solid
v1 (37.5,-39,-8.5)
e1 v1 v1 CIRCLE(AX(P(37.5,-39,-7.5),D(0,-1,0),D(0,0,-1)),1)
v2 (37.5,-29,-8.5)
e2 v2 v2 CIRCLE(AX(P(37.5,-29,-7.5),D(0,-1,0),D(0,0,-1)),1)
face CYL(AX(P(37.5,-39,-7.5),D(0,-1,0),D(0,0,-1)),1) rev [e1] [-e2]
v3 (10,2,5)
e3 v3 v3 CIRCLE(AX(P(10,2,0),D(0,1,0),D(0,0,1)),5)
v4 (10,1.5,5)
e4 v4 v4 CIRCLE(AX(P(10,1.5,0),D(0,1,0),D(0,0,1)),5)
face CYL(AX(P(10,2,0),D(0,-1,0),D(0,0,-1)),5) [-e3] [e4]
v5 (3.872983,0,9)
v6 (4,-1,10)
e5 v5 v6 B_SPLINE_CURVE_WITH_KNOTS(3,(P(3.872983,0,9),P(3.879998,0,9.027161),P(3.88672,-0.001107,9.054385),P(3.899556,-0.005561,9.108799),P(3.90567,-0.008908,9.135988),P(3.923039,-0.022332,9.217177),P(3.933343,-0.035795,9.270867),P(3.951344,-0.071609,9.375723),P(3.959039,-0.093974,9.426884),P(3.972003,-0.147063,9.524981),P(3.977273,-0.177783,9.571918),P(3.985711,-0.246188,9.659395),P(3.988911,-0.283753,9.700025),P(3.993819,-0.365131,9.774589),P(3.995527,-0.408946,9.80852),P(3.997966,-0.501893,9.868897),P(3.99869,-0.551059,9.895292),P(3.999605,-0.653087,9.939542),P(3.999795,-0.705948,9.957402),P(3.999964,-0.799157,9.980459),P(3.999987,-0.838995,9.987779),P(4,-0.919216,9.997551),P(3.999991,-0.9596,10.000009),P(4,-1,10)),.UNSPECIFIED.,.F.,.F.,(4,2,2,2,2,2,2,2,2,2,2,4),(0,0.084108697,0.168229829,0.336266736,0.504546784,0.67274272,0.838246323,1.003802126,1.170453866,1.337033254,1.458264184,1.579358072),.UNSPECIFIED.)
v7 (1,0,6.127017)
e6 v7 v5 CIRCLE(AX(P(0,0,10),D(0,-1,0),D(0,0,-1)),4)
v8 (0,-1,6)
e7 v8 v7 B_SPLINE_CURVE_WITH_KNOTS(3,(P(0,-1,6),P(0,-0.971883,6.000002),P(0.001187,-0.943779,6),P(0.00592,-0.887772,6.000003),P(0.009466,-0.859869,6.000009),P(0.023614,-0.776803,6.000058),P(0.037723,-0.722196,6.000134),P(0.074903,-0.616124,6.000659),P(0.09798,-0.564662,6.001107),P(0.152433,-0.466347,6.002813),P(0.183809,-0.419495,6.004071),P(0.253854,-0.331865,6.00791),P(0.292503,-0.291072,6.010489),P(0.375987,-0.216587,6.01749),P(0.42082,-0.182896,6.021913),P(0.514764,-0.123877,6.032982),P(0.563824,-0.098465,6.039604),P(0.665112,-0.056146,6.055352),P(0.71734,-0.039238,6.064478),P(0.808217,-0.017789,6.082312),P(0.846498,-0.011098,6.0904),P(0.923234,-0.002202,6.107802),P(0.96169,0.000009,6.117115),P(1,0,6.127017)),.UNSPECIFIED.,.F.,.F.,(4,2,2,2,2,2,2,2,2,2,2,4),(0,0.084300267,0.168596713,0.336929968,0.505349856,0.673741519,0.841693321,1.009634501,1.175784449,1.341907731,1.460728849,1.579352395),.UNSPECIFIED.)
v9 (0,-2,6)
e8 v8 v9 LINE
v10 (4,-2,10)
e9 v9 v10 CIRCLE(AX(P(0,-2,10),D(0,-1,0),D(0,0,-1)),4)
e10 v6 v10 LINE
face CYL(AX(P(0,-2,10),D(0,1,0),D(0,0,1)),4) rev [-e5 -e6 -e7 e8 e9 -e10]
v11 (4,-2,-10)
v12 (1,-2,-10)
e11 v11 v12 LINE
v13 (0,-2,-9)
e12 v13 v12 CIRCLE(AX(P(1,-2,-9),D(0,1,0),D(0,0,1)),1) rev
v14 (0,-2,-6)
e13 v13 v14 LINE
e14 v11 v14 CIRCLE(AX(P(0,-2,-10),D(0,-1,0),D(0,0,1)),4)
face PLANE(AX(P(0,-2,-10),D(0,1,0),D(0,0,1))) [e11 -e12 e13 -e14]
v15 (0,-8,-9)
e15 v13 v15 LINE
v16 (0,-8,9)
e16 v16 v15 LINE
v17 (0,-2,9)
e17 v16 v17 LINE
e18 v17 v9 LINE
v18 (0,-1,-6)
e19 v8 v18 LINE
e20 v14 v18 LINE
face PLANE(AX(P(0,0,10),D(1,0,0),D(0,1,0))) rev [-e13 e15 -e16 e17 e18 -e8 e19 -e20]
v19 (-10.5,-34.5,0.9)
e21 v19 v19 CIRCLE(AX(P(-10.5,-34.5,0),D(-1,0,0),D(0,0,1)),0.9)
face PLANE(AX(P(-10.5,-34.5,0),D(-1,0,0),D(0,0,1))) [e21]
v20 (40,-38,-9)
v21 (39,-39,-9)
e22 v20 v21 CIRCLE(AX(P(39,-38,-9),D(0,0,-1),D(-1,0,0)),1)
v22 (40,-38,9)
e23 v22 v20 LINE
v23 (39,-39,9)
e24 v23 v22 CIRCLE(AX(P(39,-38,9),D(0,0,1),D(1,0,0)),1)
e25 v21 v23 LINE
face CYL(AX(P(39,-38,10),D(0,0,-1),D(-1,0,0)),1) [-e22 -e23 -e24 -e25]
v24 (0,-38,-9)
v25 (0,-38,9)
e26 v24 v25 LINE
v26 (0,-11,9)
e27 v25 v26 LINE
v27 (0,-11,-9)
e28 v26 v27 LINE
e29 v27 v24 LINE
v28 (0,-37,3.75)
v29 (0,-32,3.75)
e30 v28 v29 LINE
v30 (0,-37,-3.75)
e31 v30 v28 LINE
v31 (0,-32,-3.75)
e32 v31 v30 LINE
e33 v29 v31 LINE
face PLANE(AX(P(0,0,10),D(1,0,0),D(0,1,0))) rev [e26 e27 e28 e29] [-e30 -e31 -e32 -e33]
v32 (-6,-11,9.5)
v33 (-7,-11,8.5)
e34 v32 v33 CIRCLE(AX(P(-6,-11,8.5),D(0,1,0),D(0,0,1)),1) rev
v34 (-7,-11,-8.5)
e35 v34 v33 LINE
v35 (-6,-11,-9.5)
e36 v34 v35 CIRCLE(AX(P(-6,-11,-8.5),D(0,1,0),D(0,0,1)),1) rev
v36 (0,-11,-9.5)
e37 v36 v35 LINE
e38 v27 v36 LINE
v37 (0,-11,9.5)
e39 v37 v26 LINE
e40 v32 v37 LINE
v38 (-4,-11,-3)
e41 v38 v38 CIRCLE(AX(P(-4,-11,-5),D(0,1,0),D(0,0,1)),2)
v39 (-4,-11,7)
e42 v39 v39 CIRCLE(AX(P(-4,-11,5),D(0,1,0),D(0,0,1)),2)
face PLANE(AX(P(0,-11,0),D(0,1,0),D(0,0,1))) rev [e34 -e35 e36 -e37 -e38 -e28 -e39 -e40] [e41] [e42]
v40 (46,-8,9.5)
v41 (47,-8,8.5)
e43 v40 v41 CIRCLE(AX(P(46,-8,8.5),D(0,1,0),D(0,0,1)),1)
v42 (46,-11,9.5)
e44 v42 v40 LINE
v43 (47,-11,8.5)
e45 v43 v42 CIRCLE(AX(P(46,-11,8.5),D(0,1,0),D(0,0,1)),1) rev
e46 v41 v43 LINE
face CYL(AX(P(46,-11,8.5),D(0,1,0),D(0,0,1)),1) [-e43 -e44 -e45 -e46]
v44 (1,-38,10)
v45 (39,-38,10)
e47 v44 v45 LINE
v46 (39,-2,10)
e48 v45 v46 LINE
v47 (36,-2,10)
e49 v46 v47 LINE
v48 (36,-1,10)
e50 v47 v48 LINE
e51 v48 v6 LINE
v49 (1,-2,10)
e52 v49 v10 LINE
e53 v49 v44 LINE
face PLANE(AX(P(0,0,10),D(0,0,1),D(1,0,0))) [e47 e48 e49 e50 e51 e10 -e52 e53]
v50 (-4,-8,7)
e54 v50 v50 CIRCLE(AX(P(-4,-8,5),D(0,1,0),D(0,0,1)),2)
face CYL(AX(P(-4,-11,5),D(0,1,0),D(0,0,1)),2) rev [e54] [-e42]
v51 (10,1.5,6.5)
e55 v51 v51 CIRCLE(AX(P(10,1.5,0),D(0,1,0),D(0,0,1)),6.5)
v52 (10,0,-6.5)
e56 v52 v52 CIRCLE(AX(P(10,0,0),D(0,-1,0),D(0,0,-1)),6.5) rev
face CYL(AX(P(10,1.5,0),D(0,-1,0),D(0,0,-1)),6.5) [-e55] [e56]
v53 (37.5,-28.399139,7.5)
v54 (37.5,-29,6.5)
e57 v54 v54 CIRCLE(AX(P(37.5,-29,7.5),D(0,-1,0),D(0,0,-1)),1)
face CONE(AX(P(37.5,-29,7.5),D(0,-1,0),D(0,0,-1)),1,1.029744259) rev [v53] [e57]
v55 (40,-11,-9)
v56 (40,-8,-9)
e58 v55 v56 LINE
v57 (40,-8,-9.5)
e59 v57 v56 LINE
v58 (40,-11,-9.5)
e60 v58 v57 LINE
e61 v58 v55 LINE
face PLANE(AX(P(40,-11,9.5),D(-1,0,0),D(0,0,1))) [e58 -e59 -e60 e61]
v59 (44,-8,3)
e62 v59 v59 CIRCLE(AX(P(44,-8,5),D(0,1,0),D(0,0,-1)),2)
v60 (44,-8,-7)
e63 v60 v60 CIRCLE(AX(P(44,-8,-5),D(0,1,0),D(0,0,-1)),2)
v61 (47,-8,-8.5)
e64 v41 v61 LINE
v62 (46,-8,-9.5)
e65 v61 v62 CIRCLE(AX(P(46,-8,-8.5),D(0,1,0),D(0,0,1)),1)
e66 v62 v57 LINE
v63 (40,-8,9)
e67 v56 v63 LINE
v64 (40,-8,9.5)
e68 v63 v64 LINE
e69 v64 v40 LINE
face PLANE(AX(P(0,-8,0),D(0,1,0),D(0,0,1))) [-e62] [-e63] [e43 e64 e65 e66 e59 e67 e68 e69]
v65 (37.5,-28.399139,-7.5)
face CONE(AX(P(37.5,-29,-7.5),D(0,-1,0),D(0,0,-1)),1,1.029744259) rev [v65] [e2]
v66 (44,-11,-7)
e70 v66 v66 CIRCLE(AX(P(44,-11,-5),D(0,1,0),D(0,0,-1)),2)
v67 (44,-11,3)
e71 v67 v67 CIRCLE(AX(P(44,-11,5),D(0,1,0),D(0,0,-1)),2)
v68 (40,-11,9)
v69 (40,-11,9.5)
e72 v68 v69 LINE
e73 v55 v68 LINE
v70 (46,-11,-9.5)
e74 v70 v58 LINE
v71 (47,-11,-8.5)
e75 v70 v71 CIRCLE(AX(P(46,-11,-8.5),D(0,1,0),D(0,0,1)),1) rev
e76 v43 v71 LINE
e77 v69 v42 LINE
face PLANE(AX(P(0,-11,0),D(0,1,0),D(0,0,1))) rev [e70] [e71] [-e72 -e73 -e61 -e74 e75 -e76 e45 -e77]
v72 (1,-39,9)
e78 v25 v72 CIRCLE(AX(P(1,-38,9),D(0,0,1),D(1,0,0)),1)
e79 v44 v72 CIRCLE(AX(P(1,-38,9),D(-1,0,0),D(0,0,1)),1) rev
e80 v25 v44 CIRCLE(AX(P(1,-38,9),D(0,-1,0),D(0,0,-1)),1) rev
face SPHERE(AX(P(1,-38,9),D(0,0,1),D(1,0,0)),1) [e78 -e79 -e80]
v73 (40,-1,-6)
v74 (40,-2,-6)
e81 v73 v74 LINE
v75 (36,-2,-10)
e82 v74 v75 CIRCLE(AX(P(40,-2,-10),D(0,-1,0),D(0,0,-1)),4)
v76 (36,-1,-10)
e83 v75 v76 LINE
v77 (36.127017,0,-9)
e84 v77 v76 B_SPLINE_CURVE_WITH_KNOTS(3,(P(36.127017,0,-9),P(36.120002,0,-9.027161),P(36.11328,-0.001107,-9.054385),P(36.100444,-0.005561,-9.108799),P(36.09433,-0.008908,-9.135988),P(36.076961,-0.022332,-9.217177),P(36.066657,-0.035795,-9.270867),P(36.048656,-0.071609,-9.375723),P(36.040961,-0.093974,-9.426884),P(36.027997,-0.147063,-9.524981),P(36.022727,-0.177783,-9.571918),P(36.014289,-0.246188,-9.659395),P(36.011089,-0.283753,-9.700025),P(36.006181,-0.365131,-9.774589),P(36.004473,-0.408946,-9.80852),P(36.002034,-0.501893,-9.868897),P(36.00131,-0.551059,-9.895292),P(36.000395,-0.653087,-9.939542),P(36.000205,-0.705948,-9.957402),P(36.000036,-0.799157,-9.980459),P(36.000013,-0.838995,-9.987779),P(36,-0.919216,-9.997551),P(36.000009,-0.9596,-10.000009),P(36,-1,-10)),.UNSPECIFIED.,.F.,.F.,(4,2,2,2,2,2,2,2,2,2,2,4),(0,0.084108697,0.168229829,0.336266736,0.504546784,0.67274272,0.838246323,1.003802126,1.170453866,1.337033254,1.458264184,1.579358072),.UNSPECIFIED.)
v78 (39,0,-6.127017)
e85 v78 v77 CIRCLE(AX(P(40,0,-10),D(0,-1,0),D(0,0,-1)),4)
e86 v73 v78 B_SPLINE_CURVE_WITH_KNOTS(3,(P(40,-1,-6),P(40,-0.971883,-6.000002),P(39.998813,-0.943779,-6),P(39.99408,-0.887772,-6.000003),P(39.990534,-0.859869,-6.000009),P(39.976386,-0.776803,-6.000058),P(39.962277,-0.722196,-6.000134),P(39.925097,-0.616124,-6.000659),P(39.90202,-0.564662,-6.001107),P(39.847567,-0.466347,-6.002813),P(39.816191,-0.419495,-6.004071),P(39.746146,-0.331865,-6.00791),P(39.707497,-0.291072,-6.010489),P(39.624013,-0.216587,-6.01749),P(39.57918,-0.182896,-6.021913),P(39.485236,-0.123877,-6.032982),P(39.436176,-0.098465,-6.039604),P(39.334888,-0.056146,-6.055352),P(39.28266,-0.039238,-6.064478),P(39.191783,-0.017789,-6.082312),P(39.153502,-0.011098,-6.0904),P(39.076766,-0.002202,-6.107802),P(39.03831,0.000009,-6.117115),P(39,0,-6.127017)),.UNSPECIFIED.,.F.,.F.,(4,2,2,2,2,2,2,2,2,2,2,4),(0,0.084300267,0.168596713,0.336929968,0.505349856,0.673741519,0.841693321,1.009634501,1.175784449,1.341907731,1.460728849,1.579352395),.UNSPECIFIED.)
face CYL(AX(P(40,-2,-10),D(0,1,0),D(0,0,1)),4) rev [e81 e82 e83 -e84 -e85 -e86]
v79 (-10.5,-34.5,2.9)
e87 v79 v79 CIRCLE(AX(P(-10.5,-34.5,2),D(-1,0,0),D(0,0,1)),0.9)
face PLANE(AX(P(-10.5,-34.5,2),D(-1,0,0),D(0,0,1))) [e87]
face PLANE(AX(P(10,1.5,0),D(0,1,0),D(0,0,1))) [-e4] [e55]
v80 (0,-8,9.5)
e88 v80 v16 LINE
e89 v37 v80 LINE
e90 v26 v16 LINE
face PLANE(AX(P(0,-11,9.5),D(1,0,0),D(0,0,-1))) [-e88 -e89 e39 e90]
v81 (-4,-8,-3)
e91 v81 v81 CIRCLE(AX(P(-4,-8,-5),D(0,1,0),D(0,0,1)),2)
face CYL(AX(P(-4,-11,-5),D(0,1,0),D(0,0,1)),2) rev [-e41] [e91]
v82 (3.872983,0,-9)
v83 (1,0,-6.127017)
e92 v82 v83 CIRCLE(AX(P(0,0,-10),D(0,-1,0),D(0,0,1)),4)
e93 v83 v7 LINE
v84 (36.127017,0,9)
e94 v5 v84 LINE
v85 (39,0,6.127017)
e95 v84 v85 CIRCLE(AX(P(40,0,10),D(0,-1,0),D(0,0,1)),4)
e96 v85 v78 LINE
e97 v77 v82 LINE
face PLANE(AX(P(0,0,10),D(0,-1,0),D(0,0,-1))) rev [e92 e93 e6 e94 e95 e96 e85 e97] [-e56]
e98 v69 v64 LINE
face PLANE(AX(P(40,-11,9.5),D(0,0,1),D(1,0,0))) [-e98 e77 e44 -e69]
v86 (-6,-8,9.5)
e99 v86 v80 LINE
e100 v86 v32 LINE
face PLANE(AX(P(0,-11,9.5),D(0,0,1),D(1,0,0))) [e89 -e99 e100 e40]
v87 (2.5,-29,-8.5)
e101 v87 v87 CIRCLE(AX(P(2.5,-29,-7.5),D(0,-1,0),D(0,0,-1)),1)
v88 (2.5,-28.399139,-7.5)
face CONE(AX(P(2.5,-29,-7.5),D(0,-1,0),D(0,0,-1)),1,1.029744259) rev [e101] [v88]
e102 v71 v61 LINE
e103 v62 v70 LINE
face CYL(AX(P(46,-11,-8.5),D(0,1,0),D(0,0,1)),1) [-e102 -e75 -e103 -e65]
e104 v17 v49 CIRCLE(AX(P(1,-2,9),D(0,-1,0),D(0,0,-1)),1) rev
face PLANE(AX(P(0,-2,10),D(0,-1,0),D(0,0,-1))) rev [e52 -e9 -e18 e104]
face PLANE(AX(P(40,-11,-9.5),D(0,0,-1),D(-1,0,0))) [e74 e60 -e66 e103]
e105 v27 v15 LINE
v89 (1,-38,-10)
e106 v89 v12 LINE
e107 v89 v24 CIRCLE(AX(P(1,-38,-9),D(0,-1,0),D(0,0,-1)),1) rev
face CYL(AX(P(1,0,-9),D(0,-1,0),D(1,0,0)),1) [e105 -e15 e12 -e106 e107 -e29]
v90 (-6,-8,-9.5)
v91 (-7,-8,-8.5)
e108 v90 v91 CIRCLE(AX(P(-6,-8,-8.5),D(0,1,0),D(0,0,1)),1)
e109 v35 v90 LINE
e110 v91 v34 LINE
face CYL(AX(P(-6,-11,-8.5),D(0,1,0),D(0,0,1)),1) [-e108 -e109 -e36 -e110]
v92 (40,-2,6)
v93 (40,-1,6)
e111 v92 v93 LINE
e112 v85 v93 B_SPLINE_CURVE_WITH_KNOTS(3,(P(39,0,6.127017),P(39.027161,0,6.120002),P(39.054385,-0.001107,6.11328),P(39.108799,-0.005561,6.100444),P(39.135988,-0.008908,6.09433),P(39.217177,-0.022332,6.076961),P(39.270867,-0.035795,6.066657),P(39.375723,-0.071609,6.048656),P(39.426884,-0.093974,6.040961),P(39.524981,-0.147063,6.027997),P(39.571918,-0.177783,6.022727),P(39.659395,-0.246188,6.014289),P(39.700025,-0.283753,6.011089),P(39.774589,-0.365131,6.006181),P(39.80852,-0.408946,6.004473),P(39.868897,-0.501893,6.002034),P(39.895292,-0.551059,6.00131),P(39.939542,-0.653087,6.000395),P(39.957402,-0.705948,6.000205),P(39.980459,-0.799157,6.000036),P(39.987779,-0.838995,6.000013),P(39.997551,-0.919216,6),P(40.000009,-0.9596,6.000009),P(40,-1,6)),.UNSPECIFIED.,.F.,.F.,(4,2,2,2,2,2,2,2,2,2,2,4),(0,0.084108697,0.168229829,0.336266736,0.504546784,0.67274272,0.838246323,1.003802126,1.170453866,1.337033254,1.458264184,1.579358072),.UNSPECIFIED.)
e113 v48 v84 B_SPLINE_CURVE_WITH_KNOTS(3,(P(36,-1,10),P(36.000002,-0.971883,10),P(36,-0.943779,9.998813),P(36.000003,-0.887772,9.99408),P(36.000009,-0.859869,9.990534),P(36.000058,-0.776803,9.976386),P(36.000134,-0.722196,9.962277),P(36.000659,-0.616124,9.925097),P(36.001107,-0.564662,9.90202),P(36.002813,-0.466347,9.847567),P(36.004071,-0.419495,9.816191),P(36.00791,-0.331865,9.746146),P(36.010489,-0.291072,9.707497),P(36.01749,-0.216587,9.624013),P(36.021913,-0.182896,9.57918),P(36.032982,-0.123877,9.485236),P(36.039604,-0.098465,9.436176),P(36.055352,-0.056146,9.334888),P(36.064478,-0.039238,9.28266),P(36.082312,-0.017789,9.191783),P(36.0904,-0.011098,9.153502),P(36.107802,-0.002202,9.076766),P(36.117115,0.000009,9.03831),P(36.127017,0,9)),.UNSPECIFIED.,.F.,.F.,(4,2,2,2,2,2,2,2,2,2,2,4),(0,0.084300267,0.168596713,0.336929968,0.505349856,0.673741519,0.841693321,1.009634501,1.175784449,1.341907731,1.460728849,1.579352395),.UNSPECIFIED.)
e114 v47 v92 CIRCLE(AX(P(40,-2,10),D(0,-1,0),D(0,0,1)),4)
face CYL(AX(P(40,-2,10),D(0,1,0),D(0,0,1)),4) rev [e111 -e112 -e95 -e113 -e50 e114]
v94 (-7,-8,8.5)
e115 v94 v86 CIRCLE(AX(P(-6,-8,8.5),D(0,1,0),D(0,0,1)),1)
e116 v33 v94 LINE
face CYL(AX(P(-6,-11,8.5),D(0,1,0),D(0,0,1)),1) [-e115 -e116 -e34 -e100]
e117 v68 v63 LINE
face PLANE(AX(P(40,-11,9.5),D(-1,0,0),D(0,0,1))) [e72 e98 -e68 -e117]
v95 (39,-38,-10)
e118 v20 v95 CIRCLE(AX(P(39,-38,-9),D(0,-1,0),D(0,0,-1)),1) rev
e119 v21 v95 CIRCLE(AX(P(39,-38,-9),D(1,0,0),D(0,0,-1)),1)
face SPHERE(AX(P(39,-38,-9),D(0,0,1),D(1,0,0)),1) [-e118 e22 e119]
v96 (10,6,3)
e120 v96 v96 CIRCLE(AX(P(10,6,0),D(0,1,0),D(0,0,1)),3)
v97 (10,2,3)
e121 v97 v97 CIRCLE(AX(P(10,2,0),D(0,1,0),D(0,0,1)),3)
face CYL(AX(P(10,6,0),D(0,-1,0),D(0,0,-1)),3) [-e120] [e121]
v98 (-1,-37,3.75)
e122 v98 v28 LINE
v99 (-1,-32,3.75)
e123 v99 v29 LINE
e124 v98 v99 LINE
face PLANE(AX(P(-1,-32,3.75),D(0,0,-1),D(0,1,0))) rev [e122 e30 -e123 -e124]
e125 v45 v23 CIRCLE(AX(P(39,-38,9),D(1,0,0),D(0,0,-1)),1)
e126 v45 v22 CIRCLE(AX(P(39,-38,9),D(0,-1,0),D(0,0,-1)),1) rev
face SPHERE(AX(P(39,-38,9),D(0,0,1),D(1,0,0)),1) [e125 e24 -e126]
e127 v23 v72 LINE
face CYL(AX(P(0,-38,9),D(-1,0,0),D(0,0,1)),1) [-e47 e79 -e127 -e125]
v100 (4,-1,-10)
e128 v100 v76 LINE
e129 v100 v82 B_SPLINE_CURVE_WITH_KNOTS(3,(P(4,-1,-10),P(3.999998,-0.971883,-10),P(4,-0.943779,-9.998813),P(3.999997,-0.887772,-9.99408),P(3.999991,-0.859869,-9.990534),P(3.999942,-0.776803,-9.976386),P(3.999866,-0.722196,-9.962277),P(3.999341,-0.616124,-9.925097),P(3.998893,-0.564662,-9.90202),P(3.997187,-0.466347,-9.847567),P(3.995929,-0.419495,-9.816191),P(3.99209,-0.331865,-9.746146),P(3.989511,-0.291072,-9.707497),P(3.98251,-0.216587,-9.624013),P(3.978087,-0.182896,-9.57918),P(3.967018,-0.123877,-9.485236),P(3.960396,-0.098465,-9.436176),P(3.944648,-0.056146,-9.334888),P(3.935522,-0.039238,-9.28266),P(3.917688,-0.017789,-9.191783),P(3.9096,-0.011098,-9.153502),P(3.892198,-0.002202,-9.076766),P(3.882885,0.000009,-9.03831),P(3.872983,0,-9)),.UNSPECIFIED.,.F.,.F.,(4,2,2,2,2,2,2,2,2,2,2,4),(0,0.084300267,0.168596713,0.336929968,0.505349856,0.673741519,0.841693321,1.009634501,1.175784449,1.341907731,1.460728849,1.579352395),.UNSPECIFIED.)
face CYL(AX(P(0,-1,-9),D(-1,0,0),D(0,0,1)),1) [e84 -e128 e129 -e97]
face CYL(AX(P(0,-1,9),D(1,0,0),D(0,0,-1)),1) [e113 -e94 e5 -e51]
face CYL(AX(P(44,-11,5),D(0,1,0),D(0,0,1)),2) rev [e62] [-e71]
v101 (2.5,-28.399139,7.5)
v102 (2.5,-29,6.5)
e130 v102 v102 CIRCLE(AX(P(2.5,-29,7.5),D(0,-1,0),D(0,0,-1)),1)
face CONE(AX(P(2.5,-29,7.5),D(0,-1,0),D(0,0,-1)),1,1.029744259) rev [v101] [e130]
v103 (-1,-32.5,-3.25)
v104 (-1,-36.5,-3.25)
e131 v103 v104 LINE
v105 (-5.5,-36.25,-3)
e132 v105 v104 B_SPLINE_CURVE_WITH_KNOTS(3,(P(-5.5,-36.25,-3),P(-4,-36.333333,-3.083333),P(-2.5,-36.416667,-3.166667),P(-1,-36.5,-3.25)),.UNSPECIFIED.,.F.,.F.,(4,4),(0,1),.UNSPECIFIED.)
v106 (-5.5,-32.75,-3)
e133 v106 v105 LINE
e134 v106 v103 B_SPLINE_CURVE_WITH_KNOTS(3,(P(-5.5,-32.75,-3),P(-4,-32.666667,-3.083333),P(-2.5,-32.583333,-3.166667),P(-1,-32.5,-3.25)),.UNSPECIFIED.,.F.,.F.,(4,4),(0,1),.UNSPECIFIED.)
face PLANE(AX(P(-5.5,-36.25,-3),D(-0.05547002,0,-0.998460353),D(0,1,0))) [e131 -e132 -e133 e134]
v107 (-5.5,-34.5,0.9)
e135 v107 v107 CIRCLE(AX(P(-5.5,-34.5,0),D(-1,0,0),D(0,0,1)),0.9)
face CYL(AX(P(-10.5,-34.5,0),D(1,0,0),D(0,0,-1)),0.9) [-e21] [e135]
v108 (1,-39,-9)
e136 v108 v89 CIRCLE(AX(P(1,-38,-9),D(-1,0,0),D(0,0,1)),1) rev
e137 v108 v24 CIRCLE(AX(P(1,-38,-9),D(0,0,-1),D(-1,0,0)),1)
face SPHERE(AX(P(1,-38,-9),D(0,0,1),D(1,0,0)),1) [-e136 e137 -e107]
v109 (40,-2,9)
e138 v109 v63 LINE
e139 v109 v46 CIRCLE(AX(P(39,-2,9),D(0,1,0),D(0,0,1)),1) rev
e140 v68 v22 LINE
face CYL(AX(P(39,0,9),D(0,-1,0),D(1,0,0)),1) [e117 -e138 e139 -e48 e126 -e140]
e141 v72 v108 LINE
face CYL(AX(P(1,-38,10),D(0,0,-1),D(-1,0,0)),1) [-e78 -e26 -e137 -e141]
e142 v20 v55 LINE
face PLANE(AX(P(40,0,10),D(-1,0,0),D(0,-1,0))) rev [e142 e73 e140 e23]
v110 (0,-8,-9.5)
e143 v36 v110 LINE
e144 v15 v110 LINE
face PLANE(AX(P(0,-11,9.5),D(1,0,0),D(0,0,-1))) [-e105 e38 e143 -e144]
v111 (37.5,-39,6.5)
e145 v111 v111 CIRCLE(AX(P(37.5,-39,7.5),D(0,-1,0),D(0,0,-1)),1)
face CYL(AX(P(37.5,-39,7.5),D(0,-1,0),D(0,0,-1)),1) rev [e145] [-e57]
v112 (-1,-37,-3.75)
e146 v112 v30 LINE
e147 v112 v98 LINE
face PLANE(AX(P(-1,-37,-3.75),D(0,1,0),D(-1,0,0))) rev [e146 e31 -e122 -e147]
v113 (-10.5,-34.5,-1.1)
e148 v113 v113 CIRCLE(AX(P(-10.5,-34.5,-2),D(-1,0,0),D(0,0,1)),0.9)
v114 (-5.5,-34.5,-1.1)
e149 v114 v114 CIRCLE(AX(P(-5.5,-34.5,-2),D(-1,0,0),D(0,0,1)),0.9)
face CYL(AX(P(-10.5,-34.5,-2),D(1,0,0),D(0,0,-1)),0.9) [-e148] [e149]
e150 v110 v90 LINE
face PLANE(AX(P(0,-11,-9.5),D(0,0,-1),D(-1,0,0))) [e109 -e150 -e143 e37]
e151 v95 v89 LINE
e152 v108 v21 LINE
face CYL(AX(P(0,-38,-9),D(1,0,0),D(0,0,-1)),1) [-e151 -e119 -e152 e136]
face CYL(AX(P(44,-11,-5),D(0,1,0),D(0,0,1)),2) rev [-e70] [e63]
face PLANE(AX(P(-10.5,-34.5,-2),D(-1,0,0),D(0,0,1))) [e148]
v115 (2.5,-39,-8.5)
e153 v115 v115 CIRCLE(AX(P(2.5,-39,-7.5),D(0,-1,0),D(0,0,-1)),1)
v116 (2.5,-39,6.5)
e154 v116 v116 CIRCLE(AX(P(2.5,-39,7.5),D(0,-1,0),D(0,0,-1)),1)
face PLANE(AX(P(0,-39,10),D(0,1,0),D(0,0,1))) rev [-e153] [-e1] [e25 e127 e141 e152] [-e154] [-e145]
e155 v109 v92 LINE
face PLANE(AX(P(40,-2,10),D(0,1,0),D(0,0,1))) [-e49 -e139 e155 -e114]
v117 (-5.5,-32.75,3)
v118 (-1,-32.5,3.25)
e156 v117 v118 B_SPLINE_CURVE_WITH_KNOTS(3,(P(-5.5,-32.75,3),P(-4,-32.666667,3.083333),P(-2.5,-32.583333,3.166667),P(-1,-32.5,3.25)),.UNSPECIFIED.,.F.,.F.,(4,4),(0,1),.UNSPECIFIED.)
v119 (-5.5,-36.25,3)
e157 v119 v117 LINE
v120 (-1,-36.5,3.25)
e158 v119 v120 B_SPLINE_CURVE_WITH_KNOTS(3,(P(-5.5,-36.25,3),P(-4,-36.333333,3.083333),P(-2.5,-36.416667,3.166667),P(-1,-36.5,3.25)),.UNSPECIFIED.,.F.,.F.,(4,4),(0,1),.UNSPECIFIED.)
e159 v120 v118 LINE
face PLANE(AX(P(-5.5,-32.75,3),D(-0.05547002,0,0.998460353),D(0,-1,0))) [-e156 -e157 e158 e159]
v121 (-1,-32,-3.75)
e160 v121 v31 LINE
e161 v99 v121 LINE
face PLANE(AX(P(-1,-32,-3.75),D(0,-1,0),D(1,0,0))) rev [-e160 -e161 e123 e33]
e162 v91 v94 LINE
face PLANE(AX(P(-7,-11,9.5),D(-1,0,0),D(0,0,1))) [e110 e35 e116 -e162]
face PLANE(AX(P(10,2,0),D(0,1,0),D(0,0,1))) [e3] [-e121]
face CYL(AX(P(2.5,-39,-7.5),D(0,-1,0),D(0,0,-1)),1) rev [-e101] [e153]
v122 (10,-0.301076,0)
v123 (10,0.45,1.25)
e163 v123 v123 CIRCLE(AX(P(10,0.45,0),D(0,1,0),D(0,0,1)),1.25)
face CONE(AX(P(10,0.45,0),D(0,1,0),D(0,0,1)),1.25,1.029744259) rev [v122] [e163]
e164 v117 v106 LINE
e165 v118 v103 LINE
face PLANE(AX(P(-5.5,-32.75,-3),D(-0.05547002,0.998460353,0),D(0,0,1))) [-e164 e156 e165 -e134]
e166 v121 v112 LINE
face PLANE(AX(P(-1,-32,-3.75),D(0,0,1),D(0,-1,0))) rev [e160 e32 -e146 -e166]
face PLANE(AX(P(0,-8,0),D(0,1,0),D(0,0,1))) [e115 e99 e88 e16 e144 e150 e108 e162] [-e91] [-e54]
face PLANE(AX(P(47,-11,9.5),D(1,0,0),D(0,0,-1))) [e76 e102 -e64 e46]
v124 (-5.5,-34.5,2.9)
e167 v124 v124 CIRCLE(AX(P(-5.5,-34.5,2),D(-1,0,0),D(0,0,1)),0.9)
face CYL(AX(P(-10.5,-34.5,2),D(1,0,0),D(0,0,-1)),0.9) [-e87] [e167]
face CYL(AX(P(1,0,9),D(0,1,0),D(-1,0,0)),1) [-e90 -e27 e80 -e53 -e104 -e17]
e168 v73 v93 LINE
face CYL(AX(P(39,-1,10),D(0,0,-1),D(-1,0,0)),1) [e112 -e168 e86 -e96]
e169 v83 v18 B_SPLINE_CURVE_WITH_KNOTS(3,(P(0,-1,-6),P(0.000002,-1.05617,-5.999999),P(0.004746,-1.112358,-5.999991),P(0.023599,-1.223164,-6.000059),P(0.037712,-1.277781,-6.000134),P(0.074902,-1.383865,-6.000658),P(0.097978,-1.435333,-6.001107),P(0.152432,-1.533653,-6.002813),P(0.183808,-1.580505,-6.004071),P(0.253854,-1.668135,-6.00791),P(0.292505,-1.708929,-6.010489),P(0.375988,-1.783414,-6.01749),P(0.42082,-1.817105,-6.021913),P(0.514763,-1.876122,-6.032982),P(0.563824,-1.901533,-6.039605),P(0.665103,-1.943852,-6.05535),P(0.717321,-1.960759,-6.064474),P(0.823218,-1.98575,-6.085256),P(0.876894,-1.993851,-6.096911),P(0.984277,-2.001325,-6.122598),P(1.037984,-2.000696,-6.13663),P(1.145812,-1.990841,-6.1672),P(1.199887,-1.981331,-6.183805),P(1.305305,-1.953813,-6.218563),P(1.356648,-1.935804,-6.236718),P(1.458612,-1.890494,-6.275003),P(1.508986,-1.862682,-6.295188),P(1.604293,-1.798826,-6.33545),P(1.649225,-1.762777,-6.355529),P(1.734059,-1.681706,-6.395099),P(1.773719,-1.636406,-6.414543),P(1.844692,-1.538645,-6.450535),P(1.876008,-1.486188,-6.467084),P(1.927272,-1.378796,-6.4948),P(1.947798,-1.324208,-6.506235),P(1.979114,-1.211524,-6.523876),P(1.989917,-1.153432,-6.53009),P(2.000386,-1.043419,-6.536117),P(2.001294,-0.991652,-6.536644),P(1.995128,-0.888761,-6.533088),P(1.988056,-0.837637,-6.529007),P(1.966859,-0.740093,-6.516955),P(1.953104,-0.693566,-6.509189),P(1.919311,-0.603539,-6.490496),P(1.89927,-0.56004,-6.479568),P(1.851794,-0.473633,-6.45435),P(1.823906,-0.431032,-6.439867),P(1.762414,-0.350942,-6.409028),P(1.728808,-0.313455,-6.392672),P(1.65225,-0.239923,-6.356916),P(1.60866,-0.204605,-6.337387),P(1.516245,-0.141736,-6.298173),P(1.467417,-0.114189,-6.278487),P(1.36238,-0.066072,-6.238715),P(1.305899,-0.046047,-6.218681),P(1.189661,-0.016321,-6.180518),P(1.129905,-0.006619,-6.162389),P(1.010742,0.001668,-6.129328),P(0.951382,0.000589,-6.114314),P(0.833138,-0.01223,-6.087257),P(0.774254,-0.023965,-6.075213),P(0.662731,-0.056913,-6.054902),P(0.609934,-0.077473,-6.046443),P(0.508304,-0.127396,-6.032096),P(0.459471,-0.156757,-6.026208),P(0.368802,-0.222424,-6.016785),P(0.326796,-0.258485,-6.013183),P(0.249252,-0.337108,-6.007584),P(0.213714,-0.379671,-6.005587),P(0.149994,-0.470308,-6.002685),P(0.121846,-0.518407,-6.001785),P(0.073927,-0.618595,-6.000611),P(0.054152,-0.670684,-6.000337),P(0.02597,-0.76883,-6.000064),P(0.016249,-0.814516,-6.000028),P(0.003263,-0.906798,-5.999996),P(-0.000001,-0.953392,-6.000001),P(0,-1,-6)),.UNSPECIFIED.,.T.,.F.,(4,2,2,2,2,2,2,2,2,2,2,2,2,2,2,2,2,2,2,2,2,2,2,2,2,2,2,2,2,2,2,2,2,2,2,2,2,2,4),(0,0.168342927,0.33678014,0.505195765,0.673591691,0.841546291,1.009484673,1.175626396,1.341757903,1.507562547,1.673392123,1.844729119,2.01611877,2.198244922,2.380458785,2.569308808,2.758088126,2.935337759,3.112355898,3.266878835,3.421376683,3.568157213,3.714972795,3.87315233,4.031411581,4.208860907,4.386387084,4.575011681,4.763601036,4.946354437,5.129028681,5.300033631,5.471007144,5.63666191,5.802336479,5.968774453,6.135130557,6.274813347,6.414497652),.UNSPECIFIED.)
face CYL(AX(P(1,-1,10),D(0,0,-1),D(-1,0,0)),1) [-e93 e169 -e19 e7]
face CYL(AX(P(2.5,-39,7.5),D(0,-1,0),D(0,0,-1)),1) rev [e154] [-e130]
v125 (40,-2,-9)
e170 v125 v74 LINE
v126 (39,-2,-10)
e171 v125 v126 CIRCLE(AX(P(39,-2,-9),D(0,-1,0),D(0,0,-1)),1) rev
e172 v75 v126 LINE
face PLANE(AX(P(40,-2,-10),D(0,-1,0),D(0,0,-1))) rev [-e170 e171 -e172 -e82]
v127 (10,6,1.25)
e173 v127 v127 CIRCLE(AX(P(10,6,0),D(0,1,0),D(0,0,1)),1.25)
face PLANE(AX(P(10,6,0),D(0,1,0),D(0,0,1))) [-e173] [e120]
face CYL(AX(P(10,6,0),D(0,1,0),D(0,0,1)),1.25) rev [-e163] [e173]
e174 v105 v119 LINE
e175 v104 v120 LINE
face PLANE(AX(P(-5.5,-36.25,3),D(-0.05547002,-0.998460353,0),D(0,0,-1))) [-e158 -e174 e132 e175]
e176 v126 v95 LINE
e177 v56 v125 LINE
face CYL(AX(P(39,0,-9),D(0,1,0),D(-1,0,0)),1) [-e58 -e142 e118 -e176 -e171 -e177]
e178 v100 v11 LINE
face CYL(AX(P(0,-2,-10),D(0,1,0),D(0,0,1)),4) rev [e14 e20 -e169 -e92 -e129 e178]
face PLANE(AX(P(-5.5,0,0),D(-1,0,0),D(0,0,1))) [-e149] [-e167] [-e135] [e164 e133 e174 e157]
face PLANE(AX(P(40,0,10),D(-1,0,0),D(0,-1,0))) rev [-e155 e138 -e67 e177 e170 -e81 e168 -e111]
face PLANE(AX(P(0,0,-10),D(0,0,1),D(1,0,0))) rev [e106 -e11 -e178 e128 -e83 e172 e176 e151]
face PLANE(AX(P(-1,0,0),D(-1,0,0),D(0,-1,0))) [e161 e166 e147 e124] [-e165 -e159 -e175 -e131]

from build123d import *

# Parameters (mm, degrees)
SKETCH_2_W                = 40
SKETCH_2_H                = 39
EXTRUDE_1_DEPTH           = 10
FILLET_1_R                = 1
SKETCH_6_R                = 4
CUT_EXTRUDE_1_DEPTH       = 2
HOLE_WIZARD_2_0_2_2_D     = 2
HOLE_WIZARD_2_0_2_2_DEPTH = 10
HOLE_WIZARD_2_0_2_2_TIP   = 0.600860619
EXTRUDE_START             = -8
SKETCH_16_W               = 7
SKETCH_16_H               = 19
SKETCH_16_R               = 2
EXTRUDE_2_DEPTH           = 3
SKETCH_17_R               = 6.5
EXTRUDE_3_DEPTH           = 1.5
SKETCH_18_R               = 5
EXTRUDE_4_DEPTH           = 0.5
SKETCH_19_R               = 3
EXTRUDE_5_DEPTH           = 4
FILLET_2_R                = 1
HOLE_WIZARD_M3_1_D        = 2.5
HOLE_WIZARD_M3_1_DEPTH    = 5.55
HOLE_WIZARD_M3_1_TIP      = 0.751075774
SKETCH_22_W               = 7.5
SKETCH_22_H               = 5
EXTRUDE_6_DEPTH           = 1
LOFT_1_OUTLINE_W          = 3.5
LOFT_1_OUTLINE_H          = 6
LOFT_1_DEPTH              = 4.5
LOFT_1_DRAFT              = -3.1798301
SKETCH_26_R               = 0.9
EXTRUDE_8_DEPTH           = 5


# Read off the part's stored shape, not the designer's step: 放样1
with BuildPart() as part:
    # 草图2 → 凸台-拉伸1 (new, symmetric)
    with BuildSketch(Plane.XY):
        with Locations((20, -19.5)):
            Rectangle(SKETCH_2_W, SKETCH_2_H)
    extrude(amount=EXTRUDE_1_DEPTH, both=True)

    # 圆角1
    fillet_1_edges = [part.edges().sort_by_distance(p)[0] for p in [
        (40, -19.5, 10),
        (20, 0, 10),
        (0, -19.5, 10),
        (20, 0, -10),
        (40, -19.5, -10),
        (20, -39, -10),
        (0, -19.5, -10),
        (20, -39, 10),
        (0, 0, 0),
        (40, 0, 0),
        (40, -39, 0),
        (0, -39, 0),
    ]]
    fillet(fillet_1_edges, radius=FILLET_1_R)

    # 草图6 → 切除-拉伸1 (cut)
    with BuildSketch(Plane.XZ):
        with Locations((0, 10)):
            Circle(SKETCH_6_R)
        with Locations((40, 10)):
            Circle(SKETCH_6_R)
        with Locations((40, -10)):
            Circle(SKETCH_6_R)
        with Locations((0, -10)):
            Circle(SKETCH_6_R)
    extrude(amount=CUT_EXTRUDE_1_DEPTH, mode=Mode.SUBTRACT)

    # Ø2.0 (2) 直径孔2
    with Locations(Plane(origin=(0, -39, 0), x_dir=(-1, 0, 0), z_dir=(0, -1, 0))):
        with Locations((-37.5, 7.5), (-37.5, -7.5), (-2.5, 7.5), (-2.5, -7.5)):
            Hole(HOLE_WIZARD_2_0_2_2_D / 2, depth=HOLE_WIZARD_2_0_2_2_DEPTH)
            with Locations((0, 0, -(HOLE_WIZARD_2_0_2_2_DEPTH + HOLE_WIZARD_2_0_2_2_TIP / 2))):  # 118° drill point
                Cone(0, HOLE_WIZARD_2_0_2_2_D / 2, HOLE_WIZARD_2_0_2_2_TIP, mode=Mode.SUBTRACT)

    # 草图16 → 凸台-拉伸2 (add)
    # profile 1 of 2: a face of its own
    with BuildSketch(Plane(origin=(0, 0, 0), x_dir=(1, 0, 0), z_dir=(0, 1, 0)).offset(EXTRUDE_START)):
        with Locations((-3.5, 0)):
            Rectangle(SKETCH_16_W, SKETCH_16_H)
        with Locations(Location((-4, -5, 0), (0, 0, 270))):
            Circle(SKETCH_16_R, mode=Mode.SUBTRACT)
        with Locations(Location((-4, 5, 0), (0, 0, 270))):
            Circle(SKETCH_16_R, mode=Mode.SUBTRACT)
    # profile 2 of 2: a face of its own
    with BuildSketch(Plane(origin=(0, 0, 0), x_dir=(1, 0, 0), z_dir=(0, 1, 0)).offset(EXTRUDE_START)):
        with Locations((43.5, 0)):
            Rectangle(SKETCH_16_W, SKETCH_16_H)
        with Locations(Location((44, 5, 0), (0, 0, 90))):
            Circle(SKETCH_16_R, mode=Mode.SUBTRACT)
        with Locations(Location((44, -5, 0), (0, 0, 90))):
            Circle(SKETCH_16_R, mode=Mode.SUBTRACT)
    extrude(amount=-EXTRUDE_2_DEPTH)

    # 草图17 → 凸台-拉伸3 (add)
    with BuildSketch(Plane(origin=(0, 0, 0), x_dir=(1, 0, 0), z_dir=(0, 1, 0))):
        with Locations(Location((10, 0, 0), (0, 0, 90))):
            Circle(SKETCH_17_R)
    extrude(amount=EXTRUDE_3_DEPTH)

    # 草图18 → 凸台-拉伸4 (add)
    with BuildSketch(Plane(origin=(0, 1.5, 0), x_dir=(1, 0, 0), z_dir=(0, 1, 0))):
        with Locations(Location((10, 0, 0), (0, 0, 270))):
            Circle(SKETCH_18_R)
    extrude(amount=EXTRUDE_4_DEPTH)

    # 草图19 → 凸台-拉伸5 (add)
    with BuildSketch(Plane(origin=(0, 2, 0), x_dir=(1, 0, 0), z_dir=(0, 1, 0))):
        with Locations(Location((10, 0, 0), (0, 0, 270))):
            Circle(SKETCH_19_R)
    extrude(amount=EXTRUDE_5_DEPTH)

    # 圆角2
    fillet_2_edges = [part.edges().sort_by_distance(p)[0] for p in [
        (-7, -9.5, 9.5),
        (-7, -9.5, -9.5),
        (47, -9.5, 9.5),
        (47, -9.5, -9.5),
    ]]
    fillet(fillet_2_edges, radius=FILLET_2_R)

    # M3 螺纹孔1
    with Locations(Plane(origin=(0, 6, 0), x_dir=(1, 0, 0), z_dir=(0, 1, 0))):
        with Locations((10, 0)):
            Hole(HOLE_WIZARD_M3_1_D / 2, depth=HOLE_WIZARD_M3_1_DEPTH)
            with Locations((0, 0, -(HOLE_WIZARD_M3_1_DEPTH + HOLE_WIZARD_M3_1_TIP / 2))):  # 118° drill point
                Cone(0, HOLE_WIZARD_M3_1_D / 2, HOLE_WIZARD_M3_1_TIP, mode=Mode.SUBTRACT)

    # 草图22 → 凸台-拉伸6 (add)
    with BuildSketch(Plane.ZY):
        with Locations((0, -34.5)):
            Rectangle(SKETCH_22_W, SKETCH_22_H)
    extrude(amount=EXTRUDE_6_DEPTH)


with BuildPart() as loft_1_tool:
    # 放样1 outline → 放样1 (with draft: the straight prism first)
    with BuildSketch(Plane.YZ.offset(-5.5)):
        with Locations((-34.5, 0)):
            Rectangle(LOFT_1_OUTLINE_W, LOFT_1_OUTLINE_H)
    extrude(amount=LOFT_1_DEPTH)
    # 放样1: the draft: its side faces are tilted about the plane it starts from
    loft_1_sides = [loft_1_tool.faces().sort_by_distance(p)[0] for p in [
        (-3.25, -36.25, 0),
        (-3.25, -34.5, -3),
        (-3.25, -32.75, 0),
        (-3.25, -34.5, 3),
    ]]
    draft(loft_1_sides, Plane.YZ.offset(-5.5), LOFT_1_DRAFT)


with BuildPart() as part_1:
    add(part.part)

    # 放样1: add loft_1_tool
    add(loft_1_tool.part)

    # 草图26 → 凸台-拉伸8 (add)
    with BuildSketch(Plane.ZY.offset(5.5)):
        with Locations((-2, -34.5)):
            Circle(SKETCH_26_R)
        with Locations((0, -34.5)):
            Circle(SKETCH_26_R)
        with Locations((2, -34.5)):
            Circle(SKETCH_26_R)
    extrude(amount=EXTRUDE_8_DEPTH)


solid = part_1.part
